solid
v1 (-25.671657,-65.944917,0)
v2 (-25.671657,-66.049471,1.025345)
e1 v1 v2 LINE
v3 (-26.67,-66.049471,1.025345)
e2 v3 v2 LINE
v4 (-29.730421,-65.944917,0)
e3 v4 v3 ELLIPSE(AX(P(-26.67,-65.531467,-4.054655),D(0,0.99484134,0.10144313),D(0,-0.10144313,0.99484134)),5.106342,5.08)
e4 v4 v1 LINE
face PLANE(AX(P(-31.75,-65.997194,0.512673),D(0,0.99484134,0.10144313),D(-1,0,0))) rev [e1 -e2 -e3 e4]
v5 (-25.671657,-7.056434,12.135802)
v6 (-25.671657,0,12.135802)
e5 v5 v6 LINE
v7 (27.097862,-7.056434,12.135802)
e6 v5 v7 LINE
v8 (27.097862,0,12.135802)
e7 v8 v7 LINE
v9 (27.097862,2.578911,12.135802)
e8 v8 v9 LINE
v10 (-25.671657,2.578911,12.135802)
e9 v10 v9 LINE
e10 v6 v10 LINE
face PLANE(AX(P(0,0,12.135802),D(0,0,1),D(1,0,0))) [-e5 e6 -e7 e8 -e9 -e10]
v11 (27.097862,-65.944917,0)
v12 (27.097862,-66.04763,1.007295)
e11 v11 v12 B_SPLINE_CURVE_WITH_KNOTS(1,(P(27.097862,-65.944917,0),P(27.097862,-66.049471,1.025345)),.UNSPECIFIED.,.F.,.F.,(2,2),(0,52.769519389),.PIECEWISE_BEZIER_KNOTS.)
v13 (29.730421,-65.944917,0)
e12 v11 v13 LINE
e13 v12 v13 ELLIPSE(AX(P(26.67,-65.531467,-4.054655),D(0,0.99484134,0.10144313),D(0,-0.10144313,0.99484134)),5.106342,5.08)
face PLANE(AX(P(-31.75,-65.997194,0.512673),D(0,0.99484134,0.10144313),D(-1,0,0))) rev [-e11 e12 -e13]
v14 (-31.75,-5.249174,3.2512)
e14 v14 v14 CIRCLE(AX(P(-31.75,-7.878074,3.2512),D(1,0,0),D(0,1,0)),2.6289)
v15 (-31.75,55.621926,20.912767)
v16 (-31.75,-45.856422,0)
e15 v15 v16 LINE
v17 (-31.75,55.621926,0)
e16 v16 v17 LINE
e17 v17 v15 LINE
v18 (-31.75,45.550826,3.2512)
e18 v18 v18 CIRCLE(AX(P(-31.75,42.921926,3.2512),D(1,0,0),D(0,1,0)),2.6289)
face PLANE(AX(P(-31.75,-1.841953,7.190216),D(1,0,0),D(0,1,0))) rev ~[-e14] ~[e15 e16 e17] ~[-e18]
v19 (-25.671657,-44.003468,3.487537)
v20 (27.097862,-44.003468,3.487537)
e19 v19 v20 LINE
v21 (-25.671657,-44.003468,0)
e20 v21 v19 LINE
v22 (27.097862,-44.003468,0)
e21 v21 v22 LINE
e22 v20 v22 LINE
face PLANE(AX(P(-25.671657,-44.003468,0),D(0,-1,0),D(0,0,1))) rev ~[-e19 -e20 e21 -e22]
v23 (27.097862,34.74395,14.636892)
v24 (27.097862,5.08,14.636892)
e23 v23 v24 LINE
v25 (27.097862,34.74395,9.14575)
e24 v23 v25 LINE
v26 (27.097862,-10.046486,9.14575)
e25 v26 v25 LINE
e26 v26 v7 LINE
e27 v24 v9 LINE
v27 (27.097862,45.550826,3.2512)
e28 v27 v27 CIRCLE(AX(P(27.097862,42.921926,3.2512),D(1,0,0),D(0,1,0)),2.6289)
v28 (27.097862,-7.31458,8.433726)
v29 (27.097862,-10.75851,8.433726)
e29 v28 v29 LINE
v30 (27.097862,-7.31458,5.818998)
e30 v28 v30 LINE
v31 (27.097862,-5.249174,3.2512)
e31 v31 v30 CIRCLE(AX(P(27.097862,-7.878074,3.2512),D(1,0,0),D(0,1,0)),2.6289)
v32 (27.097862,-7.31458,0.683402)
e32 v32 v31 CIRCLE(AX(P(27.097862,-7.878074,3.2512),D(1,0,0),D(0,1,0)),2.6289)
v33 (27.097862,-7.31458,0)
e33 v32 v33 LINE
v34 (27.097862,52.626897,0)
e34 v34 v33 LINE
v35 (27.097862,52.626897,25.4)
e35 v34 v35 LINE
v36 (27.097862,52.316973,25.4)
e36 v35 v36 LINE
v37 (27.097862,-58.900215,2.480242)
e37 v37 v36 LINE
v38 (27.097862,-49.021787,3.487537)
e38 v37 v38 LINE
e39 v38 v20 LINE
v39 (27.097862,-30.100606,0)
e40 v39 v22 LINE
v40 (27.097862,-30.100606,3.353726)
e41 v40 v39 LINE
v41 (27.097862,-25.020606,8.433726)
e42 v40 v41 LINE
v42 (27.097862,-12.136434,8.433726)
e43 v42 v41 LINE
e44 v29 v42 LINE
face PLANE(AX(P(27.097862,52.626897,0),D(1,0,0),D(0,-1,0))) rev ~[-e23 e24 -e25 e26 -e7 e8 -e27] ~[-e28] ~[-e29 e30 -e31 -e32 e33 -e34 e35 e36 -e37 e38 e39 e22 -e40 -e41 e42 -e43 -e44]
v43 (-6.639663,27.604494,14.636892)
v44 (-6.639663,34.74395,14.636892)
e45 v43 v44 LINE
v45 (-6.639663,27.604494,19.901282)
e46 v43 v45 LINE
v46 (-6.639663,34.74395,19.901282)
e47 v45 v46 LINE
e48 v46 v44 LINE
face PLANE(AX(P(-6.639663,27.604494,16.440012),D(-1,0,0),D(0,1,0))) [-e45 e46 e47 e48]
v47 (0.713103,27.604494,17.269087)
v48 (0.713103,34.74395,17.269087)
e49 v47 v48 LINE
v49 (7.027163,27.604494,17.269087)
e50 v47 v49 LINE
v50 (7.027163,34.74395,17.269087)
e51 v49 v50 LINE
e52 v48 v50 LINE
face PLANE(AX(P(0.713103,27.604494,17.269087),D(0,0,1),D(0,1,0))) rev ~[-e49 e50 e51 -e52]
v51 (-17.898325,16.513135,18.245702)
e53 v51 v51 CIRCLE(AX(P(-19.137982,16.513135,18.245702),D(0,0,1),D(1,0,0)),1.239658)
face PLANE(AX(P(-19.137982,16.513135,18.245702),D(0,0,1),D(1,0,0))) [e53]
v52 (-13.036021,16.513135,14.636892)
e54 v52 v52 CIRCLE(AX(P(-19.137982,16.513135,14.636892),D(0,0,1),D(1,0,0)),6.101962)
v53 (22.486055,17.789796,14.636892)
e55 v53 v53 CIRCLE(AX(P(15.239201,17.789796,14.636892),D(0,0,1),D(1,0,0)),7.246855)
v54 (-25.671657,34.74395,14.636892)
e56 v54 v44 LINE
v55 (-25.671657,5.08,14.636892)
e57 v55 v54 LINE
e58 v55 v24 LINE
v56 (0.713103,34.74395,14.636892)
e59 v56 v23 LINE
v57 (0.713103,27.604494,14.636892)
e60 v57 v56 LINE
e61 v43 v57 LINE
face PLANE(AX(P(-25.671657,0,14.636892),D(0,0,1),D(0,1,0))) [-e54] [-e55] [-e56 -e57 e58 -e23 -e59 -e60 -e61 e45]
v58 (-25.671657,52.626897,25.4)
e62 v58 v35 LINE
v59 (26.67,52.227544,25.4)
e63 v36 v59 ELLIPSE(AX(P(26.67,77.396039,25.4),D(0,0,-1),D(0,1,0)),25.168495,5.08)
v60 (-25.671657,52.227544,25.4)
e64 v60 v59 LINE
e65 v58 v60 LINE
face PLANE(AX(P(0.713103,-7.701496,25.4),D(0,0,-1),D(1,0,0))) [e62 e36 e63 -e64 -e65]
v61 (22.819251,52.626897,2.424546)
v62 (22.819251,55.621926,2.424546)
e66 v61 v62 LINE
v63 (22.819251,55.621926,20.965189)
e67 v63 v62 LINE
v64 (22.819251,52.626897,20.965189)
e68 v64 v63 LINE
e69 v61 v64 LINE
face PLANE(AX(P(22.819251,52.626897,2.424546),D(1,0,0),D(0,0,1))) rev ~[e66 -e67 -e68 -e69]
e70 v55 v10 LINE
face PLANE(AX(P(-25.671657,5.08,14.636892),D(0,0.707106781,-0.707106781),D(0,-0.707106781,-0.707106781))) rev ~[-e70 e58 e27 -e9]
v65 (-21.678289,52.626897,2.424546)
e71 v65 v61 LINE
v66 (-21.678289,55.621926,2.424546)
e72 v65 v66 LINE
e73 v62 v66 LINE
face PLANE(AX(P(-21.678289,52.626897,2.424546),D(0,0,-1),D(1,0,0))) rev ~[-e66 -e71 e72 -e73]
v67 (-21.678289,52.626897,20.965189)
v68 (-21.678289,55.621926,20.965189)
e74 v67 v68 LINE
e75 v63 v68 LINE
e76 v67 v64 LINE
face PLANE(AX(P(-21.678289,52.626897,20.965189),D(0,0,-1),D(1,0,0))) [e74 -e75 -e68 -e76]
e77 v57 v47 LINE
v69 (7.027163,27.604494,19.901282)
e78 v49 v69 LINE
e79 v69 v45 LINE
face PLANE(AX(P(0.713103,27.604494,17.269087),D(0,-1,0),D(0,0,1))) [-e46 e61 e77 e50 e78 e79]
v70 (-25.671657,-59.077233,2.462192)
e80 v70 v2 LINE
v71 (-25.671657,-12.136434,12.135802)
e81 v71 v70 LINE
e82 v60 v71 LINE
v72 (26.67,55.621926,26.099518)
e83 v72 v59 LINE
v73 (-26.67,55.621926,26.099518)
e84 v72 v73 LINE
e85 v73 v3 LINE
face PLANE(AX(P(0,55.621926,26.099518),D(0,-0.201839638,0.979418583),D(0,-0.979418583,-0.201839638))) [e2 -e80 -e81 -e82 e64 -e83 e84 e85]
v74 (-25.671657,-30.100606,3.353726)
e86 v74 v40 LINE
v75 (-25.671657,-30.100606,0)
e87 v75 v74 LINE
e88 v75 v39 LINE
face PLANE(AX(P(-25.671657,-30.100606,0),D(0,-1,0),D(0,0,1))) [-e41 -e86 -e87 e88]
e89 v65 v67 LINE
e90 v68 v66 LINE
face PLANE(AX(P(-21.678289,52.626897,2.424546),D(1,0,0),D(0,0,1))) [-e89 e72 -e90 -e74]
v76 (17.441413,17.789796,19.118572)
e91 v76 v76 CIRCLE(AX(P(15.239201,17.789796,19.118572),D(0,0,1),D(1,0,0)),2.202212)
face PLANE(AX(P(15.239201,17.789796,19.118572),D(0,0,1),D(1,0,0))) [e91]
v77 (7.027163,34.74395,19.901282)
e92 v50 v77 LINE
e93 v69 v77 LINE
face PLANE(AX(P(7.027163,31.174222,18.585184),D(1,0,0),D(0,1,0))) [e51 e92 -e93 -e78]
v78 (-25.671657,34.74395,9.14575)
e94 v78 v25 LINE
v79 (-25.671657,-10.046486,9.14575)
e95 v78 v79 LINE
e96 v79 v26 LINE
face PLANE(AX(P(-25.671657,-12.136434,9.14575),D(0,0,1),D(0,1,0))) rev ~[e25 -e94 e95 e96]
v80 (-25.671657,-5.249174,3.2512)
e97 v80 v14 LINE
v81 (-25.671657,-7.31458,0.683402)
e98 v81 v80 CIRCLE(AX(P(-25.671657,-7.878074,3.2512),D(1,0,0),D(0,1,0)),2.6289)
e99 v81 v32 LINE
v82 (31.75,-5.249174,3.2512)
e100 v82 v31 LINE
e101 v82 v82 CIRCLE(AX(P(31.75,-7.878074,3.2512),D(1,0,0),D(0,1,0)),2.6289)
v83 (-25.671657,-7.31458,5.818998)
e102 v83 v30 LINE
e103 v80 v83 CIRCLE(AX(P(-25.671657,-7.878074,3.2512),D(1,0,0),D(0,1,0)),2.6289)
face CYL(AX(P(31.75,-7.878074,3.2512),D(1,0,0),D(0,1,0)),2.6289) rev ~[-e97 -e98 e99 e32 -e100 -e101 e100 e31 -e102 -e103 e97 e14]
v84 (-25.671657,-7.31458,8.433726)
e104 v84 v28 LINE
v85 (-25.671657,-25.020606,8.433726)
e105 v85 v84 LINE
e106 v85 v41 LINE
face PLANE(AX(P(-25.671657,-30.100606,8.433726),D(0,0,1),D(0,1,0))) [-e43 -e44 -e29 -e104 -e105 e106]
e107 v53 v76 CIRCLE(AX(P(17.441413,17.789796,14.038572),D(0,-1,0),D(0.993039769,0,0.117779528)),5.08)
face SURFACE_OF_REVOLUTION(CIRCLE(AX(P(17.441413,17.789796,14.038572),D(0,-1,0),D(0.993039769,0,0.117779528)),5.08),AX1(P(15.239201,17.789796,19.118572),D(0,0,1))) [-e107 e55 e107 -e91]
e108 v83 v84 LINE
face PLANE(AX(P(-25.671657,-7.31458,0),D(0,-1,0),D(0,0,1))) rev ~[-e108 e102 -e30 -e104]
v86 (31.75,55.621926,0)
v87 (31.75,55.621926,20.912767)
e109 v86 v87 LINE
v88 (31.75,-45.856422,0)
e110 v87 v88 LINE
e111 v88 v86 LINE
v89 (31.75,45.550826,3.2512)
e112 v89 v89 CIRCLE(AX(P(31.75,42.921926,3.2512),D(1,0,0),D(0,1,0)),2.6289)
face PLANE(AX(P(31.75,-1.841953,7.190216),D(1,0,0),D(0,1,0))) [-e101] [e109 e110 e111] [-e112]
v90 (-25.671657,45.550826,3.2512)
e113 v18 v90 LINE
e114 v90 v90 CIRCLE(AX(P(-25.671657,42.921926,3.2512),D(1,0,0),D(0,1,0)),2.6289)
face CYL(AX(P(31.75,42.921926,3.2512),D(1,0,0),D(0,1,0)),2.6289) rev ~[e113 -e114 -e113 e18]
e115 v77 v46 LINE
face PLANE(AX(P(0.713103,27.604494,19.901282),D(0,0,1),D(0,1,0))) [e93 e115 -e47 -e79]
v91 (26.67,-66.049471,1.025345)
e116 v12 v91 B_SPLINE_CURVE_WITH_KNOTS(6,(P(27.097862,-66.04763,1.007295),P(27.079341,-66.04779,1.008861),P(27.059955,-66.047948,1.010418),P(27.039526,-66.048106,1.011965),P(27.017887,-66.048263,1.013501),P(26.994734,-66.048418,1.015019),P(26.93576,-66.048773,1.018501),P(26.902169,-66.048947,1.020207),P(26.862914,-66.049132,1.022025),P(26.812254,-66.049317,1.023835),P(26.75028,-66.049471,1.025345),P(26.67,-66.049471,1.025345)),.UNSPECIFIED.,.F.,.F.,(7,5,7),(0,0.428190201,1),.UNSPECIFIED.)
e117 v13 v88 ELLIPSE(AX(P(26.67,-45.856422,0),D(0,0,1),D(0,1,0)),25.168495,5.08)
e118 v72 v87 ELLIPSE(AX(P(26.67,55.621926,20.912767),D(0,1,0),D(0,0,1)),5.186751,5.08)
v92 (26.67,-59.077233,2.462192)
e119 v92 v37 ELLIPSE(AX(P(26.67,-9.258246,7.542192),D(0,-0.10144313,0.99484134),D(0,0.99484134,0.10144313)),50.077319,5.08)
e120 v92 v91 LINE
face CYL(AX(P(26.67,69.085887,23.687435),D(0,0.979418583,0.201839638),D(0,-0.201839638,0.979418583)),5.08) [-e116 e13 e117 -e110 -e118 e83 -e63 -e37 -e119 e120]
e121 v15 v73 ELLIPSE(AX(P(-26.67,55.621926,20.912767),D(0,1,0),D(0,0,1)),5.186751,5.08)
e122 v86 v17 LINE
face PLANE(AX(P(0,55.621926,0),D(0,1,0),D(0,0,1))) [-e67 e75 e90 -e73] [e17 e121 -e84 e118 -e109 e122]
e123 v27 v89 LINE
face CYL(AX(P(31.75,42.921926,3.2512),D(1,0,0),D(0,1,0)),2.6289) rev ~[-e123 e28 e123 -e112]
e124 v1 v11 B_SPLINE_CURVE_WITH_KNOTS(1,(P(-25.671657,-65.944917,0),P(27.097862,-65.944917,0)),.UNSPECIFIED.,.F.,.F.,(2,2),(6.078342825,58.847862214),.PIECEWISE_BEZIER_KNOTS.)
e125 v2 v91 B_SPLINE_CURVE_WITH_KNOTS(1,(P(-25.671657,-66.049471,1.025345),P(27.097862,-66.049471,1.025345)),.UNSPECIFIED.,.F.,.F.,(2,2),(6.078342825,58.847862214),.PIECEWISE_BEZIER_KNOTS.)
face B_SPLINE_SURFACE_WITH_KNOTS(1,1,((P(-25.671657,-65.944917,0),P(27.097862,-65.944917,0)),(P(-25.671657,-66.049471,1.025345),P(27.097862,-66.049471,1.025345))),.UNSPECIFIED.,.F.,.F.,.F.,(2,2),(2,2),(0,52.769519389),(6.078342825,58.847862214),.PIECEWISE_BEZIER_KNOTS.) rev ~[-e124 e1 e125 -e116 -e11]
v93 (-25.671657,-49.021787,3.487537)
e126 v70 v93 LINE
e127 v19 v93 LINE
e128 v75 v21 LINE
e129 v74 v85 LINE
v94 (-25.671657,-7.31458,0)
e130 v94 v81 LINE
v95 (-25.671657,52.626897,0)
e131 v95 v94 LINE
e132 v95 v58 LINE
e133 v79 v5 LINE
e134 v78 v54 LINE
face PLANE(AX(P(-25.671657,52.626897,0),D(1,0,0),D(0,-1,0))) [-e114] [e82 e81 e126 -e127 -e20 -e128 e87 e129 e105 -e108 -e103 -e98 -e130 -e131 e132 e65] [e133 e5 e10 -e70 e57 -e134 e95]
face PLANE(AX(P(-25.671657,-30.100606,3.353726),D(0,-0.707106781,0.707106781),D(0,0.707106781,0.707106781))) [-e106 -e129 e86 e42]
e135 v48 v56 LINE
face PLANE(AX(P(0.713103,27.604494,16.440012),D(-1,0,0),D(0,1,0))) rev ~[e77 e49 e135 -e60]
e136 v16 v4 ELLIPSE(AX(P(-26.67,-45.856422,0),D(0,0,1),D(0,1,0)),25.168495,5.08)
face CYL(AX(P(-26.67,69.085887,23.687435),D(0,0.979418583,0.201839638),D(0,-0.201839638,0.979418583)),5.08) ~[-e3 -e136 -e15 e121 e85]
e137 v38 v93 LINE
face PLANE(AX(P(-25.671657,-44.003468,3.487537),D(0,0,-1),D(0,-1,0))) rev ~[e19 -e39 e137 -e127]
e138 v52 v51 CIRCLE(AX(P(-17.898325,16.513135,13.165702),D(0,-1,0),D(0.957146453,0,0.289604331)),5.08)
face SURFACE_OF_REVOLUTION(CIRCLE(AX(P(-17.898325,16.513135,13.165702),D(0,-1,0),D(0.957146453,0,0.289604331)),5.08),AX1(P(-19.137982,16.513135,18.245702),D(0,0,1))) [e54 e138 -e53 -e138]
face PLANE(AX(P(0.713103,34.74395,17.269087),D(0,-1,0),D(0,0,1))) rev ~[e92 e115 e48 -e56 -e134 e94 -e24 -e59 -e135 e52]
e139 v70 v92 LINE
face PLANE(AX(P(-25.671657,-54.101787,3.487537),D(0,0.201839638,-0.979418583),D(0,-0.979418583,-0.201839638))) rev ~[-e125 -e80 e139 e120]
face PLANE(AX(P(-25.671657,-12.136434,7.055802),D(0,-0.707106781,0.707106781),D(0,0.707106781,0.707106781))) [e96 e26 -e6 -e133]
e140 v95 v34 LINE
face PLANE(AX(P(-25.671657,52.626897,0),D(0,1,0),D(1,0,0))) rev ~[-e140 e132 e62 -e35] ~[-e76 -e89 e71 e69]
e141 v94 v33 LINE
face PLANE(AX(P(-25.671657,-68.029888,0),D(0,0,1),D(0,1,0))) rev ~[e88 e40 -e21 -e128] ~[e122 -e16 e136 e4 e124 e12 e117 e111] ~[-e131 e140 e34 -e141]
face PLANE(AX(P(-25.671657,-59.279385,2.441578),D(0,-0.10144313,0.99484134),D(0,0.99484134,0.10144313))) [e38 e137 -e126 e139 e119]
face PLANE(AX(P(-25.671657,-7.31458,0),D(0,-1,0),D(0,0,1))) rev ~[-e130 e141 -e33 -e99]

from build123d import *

# Parameters (mm, degrees)
F1_DEPTH      = 31.75
F2_W          = 52.7695193887
F2_H          = 120.6567846239
F3_DEPTH      = 25.4
F4_W          = 44.4975402206
F4_H          = 18.5406431556
F5_DEPTH      = 25.4
F6_W          = 34.7439497709
F6_H          = 5.4911417693
F7_DEPTH      = 54.31181
F8_W          = 12.1364339493
F8_H          = 2.9900523731
F9_DEPTH      = 56.69838
F10_W         = 22.7860264232
F10_H         = 8.4337261604
F11_DEPTH     = 56.06512
F12_T1_DEPTH  = 52.7695193887
F12_T6_DEPTH  = 52.7695193887
F12_T11_DEPTH = 52.7695193887
F14_DEPTH     = 55.98348
F15_T1_DEPTH  = 52.7695193887
F16_R         = 7.2468545108
F17_DEPTH     = 4.48168
F19_SIZE      = 5.08
F20_T1_DEPTH  = 149.6281885647
F21_R         = 6.1019617507
F22_DEPTH     = 3.60881
F24_R         = 2.6289
F25_DEPTH     = 82.93478
F26_DEPTH     = 96.11065
F27_W         = 7.3527656496
F27_H         = 7.1394555271
F28_DEPTH     = 1.80312
F29_DEPTH     = 3.46127
F30_W         = 7.1394555271
F30_H         = 2.632195
F31_DEPTH     = 6.31406


# Not quite as in the source:
# - a fillet or chamfer that OpenCascade refuses, or shapes differently, is made with other operations: its cross-section is extruded or revolved along the edge and cut away or added


with BuildPart() as f1:
    # F0 (on Right) → F1 (new body, symmetric)
    with BuildSketch(Plane.YZ):
        Polygon((55.6219257414, 26.0995179415), (-71.0249170661, 0), (55.6219257414, 0), align=None)
    extrude(amount=F1_DEPTH, both=True)

    # F2 (on face) → F3 (cut)
    with BuildSketch(Plane(origin=(0, 0, 0), x_dir=(1, 0, 0), z_dir=(0, 0, -1))):
        with Locations((0.7131025195, 7.7014956623)):
            Rectangle(F2_W, F2_H)
    extrude(amount=-F3_DEPTH, mode=Mode.SUBTRACT)

    # F4 (on face) → F5 (cut)
    with BuildSketch(Plane.XZ.offset(-52.6268966496)):
        with Locations((0.5704807118, 11.6948671639)):
            Rectangle(F4_W, F4_H)
    extrude(amount=-F5_DEPTH, mode=Mode.SUBTRACT)

    # F6 (on face) → F7 (join)
    with BuildSketch(Plane.YZ.offset(-25.6716571748)):
        with Locations((17.3719748855, 11.8913206175)):
            Rectangle(F6_W, F6_H)
    extrude(amount=F7_DEPTH)

    # F8 (on face) → F9 (join)
    with BuildSketch(Plane.YZ.offset(-25.6716571748)):
        with Locations((-6.0682169747, 10.6407759194)):
            Rectangle(F8_W, F8_H)
    extrude(amount=F9_DEPTH)

    # F10 (on face) → F11 (join)
    with BuildSketch(Plane.YZ.offset(-25.6716571748)):
        with Locations((-18.7075927729, 4.2168630802)):
            Rectangle(F10_W, F10_H)
    extrude(amount=F11_DEPTH)

    # F12: chamfer of 5.08 on 3 edges, made by hand

    # F12_s2 → F12_t1 (cut)
    with BuildSketch(Plane.YZ.offset(-25.6716571748)):
        Polygon((-30.1006059845, 3.3537261604), (-25.0206059845, 8.4337261604), (-30.1006059845, 8.4337261604), align=None)
    extrude(amount=F12_T1_DEPTH, mode=Mode.SUBTRACT)


with BuildPart() as f12_tool4:
    # F12_s5 → F12_t6 (new body)
    with BuildSketch(Plane.YZ.offset(-25.6716571748)):
        Polygon((5.08, 14.6368915021), (0, 9.5568915021), (0, 14.6368915021), align=None)
    extrude(amount=F12_T6_DEPTH)

    split(bisect_by=Plane.XY.offset(12.1358021059), keep=Keep.TOP)


with BuildPart() as f1_1:
    add(f1.part)

    # F12_t3: cut F12_tool4
    add(f12_tool4.part, mode=Mode.SUBTRACT)


with BuildPart() as f12_tool9:
    # F12_s10 → F12_t11 (new body)
    with BuildSketch(Plane.YZ.offset(-25.6716571748)):
        Polygon((-12.1364339493, 7.0558021059), (-7.0564339493, 12.1358021059), (-12.1364339493, 12.1358021059), align=None)
    extrude(amount=F12_T11_DEPTH)

    split(bisect_by=Plane.XY.offset(8.4337261604), keep=Keep.TOP)


with BuildPart() as f1_2:
    add(f1_1.part)

    # F12_t8: cut F12_tool9
    add(f12_tool9.part, mode=Mode.SUBTRACT)

    # F13 (on face) → F14 (join)
    with BuildSketch(Plane.YZ.offset(-25.6716571748)):
        Polygon((-68.0298879743, 0), (-44.0034680068, 0), (-44.0034680068, 3.4875369165), (-54.1017868902, 3.4875369165), (-68.0298879743, 0.6172188251), align=None)
    extrude(amount=F14_DEPTH)

    # F15: chamfer of 5.08 on 1 edges, made by hand

    # F15_s2 → F15_t1 (cut)
    with BuildSketch(Plane.YZ.offset(-25.6716571748)):
        with BuildLine():
            Line((-59.2793850519, 2.4415783127), (-48.81963513, 3.5081501604))
            Line((-48.81963513, 3.5081501604), (-48.81963513, 3.6097501604))
            ThreePointArc((-48.81963513, 3.6097501604), (-51.4607110101, 3.5891369165), (-54.1017868902, 3.5891369165))
            Line((-54.1017868902, 3.5891369165), (-54.1222937974, 3.5870458445))
            ThreePointArc((-54.1222937974, 3.5870458445), (-56.7090125934, 3.0539720456), (-59.2998919591, 2.5410872407))
            Line((-59.2998919591, 2.5410872407), (-59.2793850519, 2.4415783127))
        make_face()
    extrude(amount=F15_T1_DEPTH, mode=Mode.SUBTRACT)

    # F16 (on face) → F17 (join)
    with BuildSketch(Plane.XY.offset(14.6368915021)):
        with Locations((15.2392005548, 17.7897959948)):
            Circle(F16_R)
    extrude(amount=F17_DEPTH)

    # F18: fillet of radius 5.08 on 1 edges, made by hand

    # F18_s1 → F18_t2 (revolve, cut)
    with BuildSketch(Plane.XZ.offset(-17.7897959948)):
        with BuildLine():
            ThreePointArc((22.4860550656, 14.6368915021), (20.8153524575, 17.8363251539), (17.4414130389, 19.1185715021))
            Line((17.4414130389, 19.1185715021), (22.4860550656, 19.1185715021))
            Line((22.4860550656, 19.1185715021), (22.4860550656, 14.6368915021))
        make_face()
    revolve(axis=Axis((15.2392005548, 17.7897959948, 19.1185715021), (0, 0, 1)), mode=Mode.SUBTRACT)

    # F19
    f19_edges = [f1_2.edges().sort_by_distance(p)[0] for p in [
        (0, -71.024917, 0),
    ]]
    chamfer(f19_edges, length=F19_SIZE)

    # F20: fillet of radius 5.08 on 2 edges, made by hand

    # F20_s2 → F20_t1 (cut)
    with BuildSketch(Plane(origin=(0, 70.954042843, 14.6222856658), x_dir=(1, 0, 0), z_dir=(0, -0.9794185829, -0.2018396378))):
        with BuildLine():
            ThreePointArc((-26.67, 14.3356435337), (-30.2621024484, 12.8477459822), (-31.75, 9.2556435337))
            Line((-31.75, 9.2556435337), (-31.75, 14.3356435337))
            Line((-31.75, 14.3356435337), (-26.67, 14.3356435337))
        make_face()
        with BuildLine():
            ThreePointArc((26.67, 14.3356435337), (30.2621024484, 12.8477459822), (31.75, 9.2556435337))
            Line((31.75, 9.2556435337), (31.75, 14.3356435337))
            Line((31.75, 14.3356435337), (26.67, 14.3356435337))
        make_face()
    extrude(amount=F20_T1_DEPTH, mode=Mode.SUBTRACT)

    # F21 (on face) → F22 (join)
    with BuildSketch(Plane.XY.offset(14.6368915021)):
        with Locations((-19.1379822791, 16.5131352842)):
            Circle(F21_R)
    extrude(amount=F22_DEPTH)

    # F23: fillet of radius 5.08 on 1 edges, made by hand

    # F23_s1 → F23_t2 (revolve, cut)
    with BuildSketch(Plane.XZ.offset(-16.5131352842)):
        with BuildLine():
            ThreePointArc((-13.0360205283, 14.6368915021), (-14.8707219244, 17.2449198831), (-17.8983245073, 18.2457015021))
            Line((-17.8983245073, 18.2457015021), (-13.0360205283, 18.2457015021))
            Line((-13.0360205283, 18.2457015021), (-13.0360205283, 14.6368915021))
        make_face()
    revolve(axis=Axis((-19.1379822791, 16.5131352842, 18.2457015021), (0, 0, 1)), mode=Mode.SUBTRACT)

    # F24 (on face) → F25 (cut)
    with BuildSketch(Plane.YZ.offset(31.75)):
        with Locations((-7.8780742586, 3.2512)):
            Circle(F24_R)
    extrude(amount=-F25_DEPTH, mode=Mode.SUBTRACT)

    # F24 (on face) → F26 (cut, symmetric)
    with BuildSketch(Plane.YZ.offset(31.75)):
        with Locations((-7.8780742586, 3.2512)):
            Circle(F24_R)
        with Locations((42.9219257414, 3.2512)):
            Circle(F24_R)
    extrude(amount=F26_DEPTH, both=True, mode=Mode.SUBTRACT)

    # F27 (on face) → F28 (join)
    with BuildSketch(Plane.XY.offset(14.6368915021)):
        with Locations((-2.9632803053, 31.1742220074)):
            Rectangle(F27_W, F27_H)
    extrude(amount=F28_DEPTH)

    # F29 (add): a face of the model
    f29_faces = [f1_2.faces().sort_by_distance(p)[0] for p in [
        (-2.9632803053, 31.1742220074, 16.4400115021),
    ]]
    extrude(f29_faces, amount=F29_DEPTH)

    # F30 (on face) → F31 (join)
    with BuildSketch(Plane.YZ.offset(0.7131025195)):
        with Locations((31.1742220074, 18.5851840021)):
            Rectangle(F30_W, F30_H)
    extrude(amount=F31_DEPTH)


solid = f1_2.part
